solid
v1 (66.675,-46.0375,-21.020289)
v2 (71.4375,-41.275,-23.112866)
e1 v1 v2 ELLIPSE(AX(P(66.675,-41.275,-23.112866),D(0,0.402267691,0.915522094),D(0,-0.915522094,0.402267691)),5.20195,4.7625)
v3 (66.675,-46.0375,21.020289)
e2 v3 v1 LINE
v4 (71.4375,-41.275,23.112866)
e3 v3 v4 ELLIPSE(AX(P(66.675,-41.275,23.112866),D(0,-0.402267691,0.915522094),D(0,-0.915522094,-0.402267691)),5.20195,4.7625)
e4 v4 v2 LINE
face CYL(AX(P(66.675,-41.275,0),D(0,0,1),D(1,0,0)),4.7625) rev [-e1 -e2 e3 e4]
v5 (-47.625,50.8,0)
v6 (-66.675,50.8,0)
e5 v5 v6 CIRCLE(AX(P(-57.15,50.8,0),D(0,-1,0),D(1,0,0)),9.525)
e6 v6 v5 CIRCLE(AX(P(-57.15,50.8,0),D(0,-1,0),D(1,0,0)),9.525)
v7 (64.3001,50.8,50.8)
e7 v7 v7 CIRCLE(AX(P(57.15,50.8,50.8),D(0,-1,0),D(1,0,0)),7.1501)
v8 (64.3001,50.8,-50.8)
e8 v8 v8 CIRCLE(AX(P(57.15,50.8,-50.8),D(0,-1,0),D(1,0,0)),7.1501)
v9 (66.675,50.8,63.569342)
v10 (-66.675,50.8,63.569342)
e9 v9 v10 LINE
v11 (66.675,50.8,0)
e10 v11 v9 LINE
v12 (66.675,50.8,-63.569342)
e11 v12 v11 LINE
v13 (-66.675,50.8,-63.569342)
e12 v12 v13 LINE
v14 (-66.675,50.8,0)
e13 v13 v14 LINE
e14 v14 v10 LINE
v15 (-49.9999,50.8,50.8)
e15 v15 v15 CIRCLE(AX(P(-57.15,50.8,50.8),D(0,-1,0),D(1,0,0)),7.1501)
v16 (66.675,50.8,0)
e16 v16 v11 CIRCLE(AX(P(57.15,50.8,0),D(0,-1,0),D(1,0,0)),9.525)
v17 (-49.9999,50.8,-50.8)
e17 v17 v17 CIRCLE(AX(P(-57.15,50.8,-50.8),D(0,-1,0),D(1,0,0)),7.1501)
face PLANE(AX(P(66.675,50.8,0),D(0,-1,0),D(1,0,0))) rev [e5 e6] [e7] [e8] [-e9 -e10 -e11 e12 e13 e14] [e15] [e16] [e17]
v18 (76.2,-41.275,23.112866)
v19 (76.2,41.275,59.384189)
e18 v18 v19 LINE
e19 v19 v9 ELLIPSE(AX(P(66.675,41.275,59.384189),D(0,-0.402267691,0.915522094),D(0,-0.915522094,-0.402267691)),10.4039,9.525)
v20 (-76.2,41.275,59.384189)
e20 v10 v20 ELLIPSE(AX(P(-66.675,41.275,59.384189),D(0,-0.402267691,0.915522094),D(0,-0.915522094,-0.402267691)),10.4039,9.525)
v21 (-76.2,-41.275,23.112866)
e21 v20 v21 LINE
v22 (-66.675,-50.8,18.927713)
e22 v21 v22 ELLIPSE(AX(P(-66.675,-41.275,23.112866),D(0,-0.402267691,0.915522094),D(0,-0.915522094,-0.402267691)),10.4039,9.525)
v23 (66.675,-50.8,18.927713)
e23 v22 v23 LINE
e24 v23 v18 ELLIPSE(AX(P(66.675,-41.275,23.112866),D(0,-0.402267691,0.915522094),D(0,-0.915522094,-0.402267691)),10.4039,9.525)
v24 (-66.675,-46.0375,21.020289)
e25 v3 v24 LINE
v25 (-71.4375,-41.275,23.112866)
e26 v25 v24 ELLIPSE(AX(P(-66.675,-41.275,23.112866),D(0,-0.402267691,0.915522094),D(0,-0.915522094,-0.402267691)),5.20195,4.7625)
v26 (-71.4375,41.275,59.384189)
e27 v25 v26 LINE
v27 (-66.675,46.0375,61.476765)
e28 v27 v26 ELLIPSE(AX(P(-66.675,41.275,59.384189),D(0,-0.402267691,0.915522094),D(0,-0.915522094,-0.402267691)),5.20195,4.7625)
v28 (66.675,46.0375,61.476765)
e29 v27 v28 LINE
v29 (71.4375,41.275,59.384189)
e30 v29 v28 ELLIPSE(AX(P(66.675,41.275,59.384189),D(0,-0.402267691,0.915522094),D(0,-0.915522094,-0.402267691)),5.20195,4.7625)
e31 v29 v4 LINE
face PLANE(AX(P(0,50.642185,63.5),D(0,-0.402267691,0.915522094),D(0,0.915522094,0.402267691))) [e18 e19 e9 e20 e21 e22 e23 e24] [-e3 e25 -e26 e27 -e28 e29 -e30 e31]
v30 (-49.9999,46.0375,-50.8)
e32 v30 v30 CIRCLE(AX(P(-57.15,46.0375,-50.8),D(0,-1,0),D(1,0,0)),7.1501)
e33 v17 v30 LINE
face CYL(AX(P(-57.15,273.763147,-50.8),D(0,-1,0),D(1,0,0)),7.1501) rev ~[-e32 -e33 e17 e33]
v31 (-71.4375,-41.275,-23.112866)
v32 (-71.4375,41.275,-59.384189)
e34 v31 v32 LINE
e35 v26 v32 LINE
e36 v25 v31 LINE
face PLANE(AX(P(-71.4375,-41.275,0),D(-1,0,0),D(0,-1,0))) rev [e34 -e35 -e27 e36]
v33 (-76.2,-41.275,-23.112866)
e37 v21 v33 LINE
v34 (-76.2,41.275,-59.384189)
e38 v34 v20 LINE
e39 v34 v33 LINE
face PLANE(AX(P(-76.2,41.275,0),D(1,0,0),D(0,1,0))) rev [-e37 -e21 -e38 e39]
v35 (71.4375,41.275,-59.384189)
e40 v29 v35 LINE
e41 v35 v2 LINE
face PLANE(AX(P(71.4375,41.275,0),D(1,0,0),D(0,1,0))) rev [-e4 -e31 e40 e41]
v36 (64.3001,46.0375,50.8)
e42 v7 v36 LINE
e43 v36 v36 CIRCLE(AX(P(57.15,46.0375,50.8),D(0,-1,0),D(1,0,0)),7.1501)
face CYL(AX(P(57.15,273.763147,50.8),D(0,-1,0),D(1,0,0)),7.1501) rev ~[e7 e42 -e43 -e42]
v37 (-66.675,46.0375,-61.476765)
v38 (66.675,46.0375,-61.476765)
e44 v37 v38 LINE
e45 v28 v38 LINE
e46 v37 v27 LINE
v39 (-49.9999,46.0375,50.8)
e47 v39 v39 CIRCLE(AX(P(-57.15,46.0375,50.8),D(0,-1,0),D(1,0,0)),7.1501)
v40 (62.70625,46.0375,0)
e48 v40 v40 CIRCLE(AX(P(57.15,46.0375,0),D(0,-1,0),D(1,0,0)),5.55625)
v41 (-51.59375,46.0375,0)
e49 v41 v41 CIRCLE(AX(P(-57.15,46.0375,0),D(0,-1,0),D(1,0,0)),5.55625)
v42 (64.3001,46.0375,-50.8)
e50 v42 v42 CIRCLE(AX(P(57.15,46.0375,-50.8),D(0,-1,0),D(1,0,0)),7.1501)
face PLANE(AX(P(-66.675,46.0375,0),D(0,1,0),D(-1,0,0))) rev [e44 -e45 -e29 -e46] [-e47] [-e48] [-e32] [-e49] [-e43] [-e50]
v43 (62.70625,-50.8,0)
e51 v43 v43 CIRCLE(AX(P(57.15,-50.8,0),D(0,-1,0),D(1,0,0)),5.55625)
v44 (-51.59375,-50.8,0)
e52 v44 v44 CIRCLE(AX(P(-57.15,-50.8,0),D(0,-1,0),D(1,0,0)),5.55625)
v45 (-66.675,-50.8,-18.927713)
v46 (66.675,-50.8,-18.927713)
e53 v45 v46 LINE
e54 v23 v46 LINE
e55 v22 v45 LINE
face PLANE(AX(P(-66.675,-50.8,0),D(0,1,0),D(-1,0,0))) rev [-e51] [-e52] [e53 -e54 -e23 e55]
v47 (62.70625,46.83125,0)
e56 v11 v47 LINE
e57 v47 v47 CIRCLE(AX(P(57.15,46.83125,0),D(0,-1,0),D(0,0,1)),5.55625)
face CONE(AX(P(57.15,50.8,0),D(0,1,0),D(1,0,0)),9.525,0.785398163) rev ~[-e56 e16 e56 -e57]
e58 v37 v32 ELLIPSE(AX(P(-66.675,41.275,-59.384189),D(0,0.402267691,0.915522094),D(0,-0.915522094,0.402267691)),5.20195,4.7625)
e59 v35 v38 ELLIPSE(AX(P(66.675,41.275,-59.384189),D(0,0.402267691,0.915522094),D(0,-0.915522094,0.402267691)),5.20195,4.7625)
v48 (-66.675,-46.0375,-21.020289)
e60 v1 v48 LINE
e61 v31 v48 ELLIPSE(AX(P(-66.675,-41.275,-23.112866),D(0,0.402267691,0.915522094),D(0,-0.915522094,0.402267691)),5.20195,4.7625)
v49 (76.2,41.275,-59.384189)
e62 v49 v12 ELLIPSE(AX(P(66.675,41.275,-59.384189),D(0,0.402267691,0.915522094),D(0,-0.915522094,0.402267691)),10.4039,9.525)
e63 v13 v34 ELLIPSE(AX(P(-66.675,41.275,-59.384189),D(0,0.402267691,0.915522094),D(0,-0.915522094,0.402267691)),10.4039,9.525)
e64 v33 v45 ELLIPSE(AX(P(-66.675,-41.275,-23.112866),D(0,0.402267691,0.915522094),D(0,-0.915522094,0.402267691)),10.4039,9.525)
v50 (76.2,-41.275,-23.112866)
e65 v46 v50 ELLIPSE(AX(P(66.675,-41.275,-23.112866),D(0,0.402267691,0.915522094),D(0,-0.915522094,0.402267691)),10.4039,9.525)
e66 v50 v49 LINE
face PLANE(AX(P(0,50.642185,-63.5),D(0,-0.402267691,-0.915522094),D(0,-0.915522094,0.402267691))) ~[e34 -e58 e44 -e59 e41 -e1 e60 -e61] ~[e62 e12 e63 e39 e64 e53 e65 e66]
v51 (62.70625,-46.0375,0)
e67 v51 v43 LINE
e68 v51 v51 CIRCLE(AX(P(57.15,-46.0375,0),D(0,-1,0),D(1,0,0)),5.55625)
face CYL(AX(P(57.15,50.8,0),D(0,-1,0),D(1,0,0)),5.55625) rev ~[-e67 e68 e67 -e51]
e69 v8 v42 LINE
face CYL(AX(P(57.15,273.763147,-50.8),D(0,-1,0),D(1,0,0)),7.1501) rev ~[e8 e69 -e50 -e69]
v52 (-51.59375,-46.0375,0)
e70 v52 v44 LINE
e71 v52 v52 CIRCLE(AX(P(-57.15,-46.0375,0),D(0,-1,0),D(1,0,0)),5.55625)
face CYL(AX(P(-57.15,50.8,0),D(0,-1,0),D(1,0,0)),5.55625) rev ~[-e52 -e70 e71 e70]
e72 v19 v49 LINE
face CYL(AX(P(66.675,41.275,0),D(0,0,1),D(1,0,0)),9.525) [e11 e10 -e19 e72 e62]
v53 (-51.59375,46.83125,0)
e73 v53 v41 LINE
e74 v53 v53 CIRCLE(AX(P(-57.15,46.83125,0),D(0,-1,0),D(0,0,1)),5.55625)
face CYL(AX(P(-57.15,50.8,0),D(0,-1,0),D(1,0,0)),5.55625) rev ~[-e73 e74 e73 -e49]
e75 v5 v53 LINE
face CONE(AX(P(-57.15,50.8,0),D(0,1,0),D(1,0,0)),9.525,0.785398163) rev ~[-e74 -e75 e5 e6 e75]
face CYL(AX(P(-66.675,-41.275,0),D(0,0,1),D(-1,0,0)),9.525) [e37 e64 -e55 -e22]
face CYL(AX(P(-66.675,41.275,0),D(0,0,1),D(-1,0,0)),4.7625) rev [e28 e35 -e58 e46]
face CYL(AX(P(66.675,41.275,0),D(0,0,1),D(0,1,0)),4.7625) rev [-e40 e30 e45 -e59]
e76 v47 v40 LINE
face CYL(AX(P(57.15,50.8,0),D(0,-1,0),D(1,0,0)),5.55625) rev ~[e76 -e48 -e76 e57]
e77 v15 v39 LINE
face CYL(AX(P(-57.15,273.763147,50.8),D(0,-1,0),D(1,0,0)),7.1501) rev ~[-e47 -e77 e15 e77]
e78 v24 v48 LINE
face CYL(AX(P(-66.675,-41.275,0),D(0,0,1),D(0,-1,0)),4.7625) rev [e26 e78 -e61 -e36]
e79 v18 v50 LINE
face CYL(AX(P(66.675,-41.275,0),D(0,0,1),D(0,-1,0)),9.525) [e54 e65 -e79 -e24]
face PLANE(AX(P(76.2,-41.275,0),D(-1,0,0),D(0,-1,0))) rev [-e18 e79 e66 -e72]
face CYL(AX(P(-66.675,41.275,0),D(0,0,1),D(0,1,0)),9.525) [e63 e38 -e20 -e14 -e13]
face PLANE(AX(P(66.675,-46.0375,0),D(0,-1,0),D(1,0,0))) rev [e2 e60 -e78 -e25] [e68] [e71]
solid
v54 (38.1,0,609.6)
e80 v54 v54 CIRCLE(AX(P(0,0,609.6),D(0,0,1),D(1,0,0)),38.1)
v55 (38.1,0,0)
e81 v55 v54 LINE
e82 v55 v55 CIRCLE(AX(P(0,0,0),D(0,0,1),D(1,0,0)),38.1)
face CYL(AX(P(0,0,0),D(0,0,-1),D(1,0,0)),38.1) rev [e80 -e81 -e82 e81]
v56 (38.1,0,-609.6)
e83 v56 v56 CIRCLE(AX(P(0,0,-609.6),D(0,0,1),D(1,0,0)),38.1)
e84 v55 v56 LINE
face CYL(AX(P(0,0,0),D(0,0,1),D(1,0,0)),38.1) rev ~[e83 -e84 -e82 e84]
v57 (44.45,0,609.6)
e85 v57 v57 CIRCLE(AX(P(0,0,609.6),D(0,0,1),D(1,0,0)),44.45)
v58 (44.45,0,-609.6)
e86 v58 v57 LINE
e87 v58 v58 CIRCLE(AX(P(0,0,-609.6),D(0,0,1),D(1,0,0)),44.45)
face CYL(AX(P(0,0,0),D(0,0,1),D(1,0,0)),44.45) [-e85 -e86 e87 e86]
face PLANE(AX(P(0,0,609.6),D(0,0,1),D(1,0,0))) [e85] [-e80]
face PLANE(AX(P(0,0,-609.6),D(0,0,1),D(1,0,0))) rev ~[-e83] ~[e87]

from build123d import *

# Parameters (mm, degrees)
F5_REACH        = 246.7313465507
F7_R            = 44.45
F7_R_2          = 38.1000004709
F8_DEPTH        = 609.6
F8_DEPTH_BACK   = 609.6
F10_D           = 14.3002
F11_D           = 11.1125
F11_CSINK_D     = 19.05
F11_CSINK_ANGLE = 90


with BuildPart() as f5:
    f5_end = Plane(origin=(0, 50.6421849132, 63.5), x_dir=(0, 0.9155220939, 0.4022676914), z_dir=(0, -0.4022676914, 0.9155220939))
    # F0 (on Top) → F5 (new body, up to a plane its end follows)
    with BuildSketch(Plane.XY):
        with BuildLine():
            ThreePointArc((76.2, 41.275), (73.4101920908, 48.0101920908), (66.675, 50.8))
            Line((66.675, 50.8), (-66.675, 50.8))
            ThreePointArc((-66.675, 50.8), (-73.4101920908, 48.0101920908), (-76.2, 41.275))
            Line((-76.2, 41.275), (-76.2, -41.275))
            ThreePointArc((-76.2, -41.275), (-73.4101920908, -48.0101920908), (-66.675, -50.8))
            Line((-66.675, -50.8), (66.675, -50.8))
            ThreePointArc((66.675, -50.8), (73.4101920908, -48.0101920908), (76.2, -41.275))
            Line((76.2, -41.275), (76.2, 41.275))
        make_face()
        with BuildLine():
            ThreePointArc((66.675, 46.0375), (70.0425960454, 44.6425960454), (71.4375, 41.275))
            Line((71.4375, 41.275), (71.4375, -41.275))
            ThreePointArc((71.4375, -41.275), (70.0425960454, -44.6425960454), (66.675, -46.0375))
            Line((66.675, -46.0375), (-66.675, -46.0375))
            ThreePointArc((-66.675, -46.0375), (-70.0425960454, -44.6425960454), (-71.4375, -41.275))
            Line((-71.4375, -41.275), (-71.4375, 41.275))
            ThreePointArc((-71.4375, 41.275), (-70.0425960454, 44.6425960454), (-66.675, 46.0375))
            Line((-66.675, 46.0375), (66.675, 46.0375))
        make_face(mode=Mode.SUBTRACT)
    f5_long = extrude(amount=F5_REACH, mode=Mode.PRIVATE)
    add(split(f5_long, bisect_by=f5_end, keep=Keep.BOTTOM, mode=Mode.PRIVATE))

    # F6: F5 across plane


with BuildPart() as f5_1:
    add(f5.part)
    add(f5.part.mirror(Plane.XY))

    # F10 (through all)
    with Locations(Plane(origin=(0, 50.8, 0), x_dir=(-1, 0, 0), z_dir=(0, 1, 0))):
        with Locations((-57.15, 50.8), (57.15, 50.8), (57.15, -50.8), (-57.15, -50.8)):
            Hole(F10_D / 2)

    # F11 (through all)
    with Locations(Plane(origin=(0, 50.8, 0), x_dir=(-1, 0, 0), z_dir=(0, 1, 0))):
        with Locations((-57.15, 0), (57.15, 0)):
            CounterSinkHole(F11_D / 2, F11_CSINK_D / 2, counter_sink_angle=F11_CSINK_ANGLE)


with BuildPart() as f8:
    # F7 (on Top) → F8 (new body, two sides)
    with BuildSketch(Plane.XY) as f8_sk:
        Circle(F7_R)
        Circle(F7_R_2, mode=Mode.SUBTRACT)
    extrude(amount=F8_DEPTH)
    extrude(f8_sk.sketch, amount=-F8_DEPTH_BACK)


solid = Compound([f5_1.part, f8.part])
